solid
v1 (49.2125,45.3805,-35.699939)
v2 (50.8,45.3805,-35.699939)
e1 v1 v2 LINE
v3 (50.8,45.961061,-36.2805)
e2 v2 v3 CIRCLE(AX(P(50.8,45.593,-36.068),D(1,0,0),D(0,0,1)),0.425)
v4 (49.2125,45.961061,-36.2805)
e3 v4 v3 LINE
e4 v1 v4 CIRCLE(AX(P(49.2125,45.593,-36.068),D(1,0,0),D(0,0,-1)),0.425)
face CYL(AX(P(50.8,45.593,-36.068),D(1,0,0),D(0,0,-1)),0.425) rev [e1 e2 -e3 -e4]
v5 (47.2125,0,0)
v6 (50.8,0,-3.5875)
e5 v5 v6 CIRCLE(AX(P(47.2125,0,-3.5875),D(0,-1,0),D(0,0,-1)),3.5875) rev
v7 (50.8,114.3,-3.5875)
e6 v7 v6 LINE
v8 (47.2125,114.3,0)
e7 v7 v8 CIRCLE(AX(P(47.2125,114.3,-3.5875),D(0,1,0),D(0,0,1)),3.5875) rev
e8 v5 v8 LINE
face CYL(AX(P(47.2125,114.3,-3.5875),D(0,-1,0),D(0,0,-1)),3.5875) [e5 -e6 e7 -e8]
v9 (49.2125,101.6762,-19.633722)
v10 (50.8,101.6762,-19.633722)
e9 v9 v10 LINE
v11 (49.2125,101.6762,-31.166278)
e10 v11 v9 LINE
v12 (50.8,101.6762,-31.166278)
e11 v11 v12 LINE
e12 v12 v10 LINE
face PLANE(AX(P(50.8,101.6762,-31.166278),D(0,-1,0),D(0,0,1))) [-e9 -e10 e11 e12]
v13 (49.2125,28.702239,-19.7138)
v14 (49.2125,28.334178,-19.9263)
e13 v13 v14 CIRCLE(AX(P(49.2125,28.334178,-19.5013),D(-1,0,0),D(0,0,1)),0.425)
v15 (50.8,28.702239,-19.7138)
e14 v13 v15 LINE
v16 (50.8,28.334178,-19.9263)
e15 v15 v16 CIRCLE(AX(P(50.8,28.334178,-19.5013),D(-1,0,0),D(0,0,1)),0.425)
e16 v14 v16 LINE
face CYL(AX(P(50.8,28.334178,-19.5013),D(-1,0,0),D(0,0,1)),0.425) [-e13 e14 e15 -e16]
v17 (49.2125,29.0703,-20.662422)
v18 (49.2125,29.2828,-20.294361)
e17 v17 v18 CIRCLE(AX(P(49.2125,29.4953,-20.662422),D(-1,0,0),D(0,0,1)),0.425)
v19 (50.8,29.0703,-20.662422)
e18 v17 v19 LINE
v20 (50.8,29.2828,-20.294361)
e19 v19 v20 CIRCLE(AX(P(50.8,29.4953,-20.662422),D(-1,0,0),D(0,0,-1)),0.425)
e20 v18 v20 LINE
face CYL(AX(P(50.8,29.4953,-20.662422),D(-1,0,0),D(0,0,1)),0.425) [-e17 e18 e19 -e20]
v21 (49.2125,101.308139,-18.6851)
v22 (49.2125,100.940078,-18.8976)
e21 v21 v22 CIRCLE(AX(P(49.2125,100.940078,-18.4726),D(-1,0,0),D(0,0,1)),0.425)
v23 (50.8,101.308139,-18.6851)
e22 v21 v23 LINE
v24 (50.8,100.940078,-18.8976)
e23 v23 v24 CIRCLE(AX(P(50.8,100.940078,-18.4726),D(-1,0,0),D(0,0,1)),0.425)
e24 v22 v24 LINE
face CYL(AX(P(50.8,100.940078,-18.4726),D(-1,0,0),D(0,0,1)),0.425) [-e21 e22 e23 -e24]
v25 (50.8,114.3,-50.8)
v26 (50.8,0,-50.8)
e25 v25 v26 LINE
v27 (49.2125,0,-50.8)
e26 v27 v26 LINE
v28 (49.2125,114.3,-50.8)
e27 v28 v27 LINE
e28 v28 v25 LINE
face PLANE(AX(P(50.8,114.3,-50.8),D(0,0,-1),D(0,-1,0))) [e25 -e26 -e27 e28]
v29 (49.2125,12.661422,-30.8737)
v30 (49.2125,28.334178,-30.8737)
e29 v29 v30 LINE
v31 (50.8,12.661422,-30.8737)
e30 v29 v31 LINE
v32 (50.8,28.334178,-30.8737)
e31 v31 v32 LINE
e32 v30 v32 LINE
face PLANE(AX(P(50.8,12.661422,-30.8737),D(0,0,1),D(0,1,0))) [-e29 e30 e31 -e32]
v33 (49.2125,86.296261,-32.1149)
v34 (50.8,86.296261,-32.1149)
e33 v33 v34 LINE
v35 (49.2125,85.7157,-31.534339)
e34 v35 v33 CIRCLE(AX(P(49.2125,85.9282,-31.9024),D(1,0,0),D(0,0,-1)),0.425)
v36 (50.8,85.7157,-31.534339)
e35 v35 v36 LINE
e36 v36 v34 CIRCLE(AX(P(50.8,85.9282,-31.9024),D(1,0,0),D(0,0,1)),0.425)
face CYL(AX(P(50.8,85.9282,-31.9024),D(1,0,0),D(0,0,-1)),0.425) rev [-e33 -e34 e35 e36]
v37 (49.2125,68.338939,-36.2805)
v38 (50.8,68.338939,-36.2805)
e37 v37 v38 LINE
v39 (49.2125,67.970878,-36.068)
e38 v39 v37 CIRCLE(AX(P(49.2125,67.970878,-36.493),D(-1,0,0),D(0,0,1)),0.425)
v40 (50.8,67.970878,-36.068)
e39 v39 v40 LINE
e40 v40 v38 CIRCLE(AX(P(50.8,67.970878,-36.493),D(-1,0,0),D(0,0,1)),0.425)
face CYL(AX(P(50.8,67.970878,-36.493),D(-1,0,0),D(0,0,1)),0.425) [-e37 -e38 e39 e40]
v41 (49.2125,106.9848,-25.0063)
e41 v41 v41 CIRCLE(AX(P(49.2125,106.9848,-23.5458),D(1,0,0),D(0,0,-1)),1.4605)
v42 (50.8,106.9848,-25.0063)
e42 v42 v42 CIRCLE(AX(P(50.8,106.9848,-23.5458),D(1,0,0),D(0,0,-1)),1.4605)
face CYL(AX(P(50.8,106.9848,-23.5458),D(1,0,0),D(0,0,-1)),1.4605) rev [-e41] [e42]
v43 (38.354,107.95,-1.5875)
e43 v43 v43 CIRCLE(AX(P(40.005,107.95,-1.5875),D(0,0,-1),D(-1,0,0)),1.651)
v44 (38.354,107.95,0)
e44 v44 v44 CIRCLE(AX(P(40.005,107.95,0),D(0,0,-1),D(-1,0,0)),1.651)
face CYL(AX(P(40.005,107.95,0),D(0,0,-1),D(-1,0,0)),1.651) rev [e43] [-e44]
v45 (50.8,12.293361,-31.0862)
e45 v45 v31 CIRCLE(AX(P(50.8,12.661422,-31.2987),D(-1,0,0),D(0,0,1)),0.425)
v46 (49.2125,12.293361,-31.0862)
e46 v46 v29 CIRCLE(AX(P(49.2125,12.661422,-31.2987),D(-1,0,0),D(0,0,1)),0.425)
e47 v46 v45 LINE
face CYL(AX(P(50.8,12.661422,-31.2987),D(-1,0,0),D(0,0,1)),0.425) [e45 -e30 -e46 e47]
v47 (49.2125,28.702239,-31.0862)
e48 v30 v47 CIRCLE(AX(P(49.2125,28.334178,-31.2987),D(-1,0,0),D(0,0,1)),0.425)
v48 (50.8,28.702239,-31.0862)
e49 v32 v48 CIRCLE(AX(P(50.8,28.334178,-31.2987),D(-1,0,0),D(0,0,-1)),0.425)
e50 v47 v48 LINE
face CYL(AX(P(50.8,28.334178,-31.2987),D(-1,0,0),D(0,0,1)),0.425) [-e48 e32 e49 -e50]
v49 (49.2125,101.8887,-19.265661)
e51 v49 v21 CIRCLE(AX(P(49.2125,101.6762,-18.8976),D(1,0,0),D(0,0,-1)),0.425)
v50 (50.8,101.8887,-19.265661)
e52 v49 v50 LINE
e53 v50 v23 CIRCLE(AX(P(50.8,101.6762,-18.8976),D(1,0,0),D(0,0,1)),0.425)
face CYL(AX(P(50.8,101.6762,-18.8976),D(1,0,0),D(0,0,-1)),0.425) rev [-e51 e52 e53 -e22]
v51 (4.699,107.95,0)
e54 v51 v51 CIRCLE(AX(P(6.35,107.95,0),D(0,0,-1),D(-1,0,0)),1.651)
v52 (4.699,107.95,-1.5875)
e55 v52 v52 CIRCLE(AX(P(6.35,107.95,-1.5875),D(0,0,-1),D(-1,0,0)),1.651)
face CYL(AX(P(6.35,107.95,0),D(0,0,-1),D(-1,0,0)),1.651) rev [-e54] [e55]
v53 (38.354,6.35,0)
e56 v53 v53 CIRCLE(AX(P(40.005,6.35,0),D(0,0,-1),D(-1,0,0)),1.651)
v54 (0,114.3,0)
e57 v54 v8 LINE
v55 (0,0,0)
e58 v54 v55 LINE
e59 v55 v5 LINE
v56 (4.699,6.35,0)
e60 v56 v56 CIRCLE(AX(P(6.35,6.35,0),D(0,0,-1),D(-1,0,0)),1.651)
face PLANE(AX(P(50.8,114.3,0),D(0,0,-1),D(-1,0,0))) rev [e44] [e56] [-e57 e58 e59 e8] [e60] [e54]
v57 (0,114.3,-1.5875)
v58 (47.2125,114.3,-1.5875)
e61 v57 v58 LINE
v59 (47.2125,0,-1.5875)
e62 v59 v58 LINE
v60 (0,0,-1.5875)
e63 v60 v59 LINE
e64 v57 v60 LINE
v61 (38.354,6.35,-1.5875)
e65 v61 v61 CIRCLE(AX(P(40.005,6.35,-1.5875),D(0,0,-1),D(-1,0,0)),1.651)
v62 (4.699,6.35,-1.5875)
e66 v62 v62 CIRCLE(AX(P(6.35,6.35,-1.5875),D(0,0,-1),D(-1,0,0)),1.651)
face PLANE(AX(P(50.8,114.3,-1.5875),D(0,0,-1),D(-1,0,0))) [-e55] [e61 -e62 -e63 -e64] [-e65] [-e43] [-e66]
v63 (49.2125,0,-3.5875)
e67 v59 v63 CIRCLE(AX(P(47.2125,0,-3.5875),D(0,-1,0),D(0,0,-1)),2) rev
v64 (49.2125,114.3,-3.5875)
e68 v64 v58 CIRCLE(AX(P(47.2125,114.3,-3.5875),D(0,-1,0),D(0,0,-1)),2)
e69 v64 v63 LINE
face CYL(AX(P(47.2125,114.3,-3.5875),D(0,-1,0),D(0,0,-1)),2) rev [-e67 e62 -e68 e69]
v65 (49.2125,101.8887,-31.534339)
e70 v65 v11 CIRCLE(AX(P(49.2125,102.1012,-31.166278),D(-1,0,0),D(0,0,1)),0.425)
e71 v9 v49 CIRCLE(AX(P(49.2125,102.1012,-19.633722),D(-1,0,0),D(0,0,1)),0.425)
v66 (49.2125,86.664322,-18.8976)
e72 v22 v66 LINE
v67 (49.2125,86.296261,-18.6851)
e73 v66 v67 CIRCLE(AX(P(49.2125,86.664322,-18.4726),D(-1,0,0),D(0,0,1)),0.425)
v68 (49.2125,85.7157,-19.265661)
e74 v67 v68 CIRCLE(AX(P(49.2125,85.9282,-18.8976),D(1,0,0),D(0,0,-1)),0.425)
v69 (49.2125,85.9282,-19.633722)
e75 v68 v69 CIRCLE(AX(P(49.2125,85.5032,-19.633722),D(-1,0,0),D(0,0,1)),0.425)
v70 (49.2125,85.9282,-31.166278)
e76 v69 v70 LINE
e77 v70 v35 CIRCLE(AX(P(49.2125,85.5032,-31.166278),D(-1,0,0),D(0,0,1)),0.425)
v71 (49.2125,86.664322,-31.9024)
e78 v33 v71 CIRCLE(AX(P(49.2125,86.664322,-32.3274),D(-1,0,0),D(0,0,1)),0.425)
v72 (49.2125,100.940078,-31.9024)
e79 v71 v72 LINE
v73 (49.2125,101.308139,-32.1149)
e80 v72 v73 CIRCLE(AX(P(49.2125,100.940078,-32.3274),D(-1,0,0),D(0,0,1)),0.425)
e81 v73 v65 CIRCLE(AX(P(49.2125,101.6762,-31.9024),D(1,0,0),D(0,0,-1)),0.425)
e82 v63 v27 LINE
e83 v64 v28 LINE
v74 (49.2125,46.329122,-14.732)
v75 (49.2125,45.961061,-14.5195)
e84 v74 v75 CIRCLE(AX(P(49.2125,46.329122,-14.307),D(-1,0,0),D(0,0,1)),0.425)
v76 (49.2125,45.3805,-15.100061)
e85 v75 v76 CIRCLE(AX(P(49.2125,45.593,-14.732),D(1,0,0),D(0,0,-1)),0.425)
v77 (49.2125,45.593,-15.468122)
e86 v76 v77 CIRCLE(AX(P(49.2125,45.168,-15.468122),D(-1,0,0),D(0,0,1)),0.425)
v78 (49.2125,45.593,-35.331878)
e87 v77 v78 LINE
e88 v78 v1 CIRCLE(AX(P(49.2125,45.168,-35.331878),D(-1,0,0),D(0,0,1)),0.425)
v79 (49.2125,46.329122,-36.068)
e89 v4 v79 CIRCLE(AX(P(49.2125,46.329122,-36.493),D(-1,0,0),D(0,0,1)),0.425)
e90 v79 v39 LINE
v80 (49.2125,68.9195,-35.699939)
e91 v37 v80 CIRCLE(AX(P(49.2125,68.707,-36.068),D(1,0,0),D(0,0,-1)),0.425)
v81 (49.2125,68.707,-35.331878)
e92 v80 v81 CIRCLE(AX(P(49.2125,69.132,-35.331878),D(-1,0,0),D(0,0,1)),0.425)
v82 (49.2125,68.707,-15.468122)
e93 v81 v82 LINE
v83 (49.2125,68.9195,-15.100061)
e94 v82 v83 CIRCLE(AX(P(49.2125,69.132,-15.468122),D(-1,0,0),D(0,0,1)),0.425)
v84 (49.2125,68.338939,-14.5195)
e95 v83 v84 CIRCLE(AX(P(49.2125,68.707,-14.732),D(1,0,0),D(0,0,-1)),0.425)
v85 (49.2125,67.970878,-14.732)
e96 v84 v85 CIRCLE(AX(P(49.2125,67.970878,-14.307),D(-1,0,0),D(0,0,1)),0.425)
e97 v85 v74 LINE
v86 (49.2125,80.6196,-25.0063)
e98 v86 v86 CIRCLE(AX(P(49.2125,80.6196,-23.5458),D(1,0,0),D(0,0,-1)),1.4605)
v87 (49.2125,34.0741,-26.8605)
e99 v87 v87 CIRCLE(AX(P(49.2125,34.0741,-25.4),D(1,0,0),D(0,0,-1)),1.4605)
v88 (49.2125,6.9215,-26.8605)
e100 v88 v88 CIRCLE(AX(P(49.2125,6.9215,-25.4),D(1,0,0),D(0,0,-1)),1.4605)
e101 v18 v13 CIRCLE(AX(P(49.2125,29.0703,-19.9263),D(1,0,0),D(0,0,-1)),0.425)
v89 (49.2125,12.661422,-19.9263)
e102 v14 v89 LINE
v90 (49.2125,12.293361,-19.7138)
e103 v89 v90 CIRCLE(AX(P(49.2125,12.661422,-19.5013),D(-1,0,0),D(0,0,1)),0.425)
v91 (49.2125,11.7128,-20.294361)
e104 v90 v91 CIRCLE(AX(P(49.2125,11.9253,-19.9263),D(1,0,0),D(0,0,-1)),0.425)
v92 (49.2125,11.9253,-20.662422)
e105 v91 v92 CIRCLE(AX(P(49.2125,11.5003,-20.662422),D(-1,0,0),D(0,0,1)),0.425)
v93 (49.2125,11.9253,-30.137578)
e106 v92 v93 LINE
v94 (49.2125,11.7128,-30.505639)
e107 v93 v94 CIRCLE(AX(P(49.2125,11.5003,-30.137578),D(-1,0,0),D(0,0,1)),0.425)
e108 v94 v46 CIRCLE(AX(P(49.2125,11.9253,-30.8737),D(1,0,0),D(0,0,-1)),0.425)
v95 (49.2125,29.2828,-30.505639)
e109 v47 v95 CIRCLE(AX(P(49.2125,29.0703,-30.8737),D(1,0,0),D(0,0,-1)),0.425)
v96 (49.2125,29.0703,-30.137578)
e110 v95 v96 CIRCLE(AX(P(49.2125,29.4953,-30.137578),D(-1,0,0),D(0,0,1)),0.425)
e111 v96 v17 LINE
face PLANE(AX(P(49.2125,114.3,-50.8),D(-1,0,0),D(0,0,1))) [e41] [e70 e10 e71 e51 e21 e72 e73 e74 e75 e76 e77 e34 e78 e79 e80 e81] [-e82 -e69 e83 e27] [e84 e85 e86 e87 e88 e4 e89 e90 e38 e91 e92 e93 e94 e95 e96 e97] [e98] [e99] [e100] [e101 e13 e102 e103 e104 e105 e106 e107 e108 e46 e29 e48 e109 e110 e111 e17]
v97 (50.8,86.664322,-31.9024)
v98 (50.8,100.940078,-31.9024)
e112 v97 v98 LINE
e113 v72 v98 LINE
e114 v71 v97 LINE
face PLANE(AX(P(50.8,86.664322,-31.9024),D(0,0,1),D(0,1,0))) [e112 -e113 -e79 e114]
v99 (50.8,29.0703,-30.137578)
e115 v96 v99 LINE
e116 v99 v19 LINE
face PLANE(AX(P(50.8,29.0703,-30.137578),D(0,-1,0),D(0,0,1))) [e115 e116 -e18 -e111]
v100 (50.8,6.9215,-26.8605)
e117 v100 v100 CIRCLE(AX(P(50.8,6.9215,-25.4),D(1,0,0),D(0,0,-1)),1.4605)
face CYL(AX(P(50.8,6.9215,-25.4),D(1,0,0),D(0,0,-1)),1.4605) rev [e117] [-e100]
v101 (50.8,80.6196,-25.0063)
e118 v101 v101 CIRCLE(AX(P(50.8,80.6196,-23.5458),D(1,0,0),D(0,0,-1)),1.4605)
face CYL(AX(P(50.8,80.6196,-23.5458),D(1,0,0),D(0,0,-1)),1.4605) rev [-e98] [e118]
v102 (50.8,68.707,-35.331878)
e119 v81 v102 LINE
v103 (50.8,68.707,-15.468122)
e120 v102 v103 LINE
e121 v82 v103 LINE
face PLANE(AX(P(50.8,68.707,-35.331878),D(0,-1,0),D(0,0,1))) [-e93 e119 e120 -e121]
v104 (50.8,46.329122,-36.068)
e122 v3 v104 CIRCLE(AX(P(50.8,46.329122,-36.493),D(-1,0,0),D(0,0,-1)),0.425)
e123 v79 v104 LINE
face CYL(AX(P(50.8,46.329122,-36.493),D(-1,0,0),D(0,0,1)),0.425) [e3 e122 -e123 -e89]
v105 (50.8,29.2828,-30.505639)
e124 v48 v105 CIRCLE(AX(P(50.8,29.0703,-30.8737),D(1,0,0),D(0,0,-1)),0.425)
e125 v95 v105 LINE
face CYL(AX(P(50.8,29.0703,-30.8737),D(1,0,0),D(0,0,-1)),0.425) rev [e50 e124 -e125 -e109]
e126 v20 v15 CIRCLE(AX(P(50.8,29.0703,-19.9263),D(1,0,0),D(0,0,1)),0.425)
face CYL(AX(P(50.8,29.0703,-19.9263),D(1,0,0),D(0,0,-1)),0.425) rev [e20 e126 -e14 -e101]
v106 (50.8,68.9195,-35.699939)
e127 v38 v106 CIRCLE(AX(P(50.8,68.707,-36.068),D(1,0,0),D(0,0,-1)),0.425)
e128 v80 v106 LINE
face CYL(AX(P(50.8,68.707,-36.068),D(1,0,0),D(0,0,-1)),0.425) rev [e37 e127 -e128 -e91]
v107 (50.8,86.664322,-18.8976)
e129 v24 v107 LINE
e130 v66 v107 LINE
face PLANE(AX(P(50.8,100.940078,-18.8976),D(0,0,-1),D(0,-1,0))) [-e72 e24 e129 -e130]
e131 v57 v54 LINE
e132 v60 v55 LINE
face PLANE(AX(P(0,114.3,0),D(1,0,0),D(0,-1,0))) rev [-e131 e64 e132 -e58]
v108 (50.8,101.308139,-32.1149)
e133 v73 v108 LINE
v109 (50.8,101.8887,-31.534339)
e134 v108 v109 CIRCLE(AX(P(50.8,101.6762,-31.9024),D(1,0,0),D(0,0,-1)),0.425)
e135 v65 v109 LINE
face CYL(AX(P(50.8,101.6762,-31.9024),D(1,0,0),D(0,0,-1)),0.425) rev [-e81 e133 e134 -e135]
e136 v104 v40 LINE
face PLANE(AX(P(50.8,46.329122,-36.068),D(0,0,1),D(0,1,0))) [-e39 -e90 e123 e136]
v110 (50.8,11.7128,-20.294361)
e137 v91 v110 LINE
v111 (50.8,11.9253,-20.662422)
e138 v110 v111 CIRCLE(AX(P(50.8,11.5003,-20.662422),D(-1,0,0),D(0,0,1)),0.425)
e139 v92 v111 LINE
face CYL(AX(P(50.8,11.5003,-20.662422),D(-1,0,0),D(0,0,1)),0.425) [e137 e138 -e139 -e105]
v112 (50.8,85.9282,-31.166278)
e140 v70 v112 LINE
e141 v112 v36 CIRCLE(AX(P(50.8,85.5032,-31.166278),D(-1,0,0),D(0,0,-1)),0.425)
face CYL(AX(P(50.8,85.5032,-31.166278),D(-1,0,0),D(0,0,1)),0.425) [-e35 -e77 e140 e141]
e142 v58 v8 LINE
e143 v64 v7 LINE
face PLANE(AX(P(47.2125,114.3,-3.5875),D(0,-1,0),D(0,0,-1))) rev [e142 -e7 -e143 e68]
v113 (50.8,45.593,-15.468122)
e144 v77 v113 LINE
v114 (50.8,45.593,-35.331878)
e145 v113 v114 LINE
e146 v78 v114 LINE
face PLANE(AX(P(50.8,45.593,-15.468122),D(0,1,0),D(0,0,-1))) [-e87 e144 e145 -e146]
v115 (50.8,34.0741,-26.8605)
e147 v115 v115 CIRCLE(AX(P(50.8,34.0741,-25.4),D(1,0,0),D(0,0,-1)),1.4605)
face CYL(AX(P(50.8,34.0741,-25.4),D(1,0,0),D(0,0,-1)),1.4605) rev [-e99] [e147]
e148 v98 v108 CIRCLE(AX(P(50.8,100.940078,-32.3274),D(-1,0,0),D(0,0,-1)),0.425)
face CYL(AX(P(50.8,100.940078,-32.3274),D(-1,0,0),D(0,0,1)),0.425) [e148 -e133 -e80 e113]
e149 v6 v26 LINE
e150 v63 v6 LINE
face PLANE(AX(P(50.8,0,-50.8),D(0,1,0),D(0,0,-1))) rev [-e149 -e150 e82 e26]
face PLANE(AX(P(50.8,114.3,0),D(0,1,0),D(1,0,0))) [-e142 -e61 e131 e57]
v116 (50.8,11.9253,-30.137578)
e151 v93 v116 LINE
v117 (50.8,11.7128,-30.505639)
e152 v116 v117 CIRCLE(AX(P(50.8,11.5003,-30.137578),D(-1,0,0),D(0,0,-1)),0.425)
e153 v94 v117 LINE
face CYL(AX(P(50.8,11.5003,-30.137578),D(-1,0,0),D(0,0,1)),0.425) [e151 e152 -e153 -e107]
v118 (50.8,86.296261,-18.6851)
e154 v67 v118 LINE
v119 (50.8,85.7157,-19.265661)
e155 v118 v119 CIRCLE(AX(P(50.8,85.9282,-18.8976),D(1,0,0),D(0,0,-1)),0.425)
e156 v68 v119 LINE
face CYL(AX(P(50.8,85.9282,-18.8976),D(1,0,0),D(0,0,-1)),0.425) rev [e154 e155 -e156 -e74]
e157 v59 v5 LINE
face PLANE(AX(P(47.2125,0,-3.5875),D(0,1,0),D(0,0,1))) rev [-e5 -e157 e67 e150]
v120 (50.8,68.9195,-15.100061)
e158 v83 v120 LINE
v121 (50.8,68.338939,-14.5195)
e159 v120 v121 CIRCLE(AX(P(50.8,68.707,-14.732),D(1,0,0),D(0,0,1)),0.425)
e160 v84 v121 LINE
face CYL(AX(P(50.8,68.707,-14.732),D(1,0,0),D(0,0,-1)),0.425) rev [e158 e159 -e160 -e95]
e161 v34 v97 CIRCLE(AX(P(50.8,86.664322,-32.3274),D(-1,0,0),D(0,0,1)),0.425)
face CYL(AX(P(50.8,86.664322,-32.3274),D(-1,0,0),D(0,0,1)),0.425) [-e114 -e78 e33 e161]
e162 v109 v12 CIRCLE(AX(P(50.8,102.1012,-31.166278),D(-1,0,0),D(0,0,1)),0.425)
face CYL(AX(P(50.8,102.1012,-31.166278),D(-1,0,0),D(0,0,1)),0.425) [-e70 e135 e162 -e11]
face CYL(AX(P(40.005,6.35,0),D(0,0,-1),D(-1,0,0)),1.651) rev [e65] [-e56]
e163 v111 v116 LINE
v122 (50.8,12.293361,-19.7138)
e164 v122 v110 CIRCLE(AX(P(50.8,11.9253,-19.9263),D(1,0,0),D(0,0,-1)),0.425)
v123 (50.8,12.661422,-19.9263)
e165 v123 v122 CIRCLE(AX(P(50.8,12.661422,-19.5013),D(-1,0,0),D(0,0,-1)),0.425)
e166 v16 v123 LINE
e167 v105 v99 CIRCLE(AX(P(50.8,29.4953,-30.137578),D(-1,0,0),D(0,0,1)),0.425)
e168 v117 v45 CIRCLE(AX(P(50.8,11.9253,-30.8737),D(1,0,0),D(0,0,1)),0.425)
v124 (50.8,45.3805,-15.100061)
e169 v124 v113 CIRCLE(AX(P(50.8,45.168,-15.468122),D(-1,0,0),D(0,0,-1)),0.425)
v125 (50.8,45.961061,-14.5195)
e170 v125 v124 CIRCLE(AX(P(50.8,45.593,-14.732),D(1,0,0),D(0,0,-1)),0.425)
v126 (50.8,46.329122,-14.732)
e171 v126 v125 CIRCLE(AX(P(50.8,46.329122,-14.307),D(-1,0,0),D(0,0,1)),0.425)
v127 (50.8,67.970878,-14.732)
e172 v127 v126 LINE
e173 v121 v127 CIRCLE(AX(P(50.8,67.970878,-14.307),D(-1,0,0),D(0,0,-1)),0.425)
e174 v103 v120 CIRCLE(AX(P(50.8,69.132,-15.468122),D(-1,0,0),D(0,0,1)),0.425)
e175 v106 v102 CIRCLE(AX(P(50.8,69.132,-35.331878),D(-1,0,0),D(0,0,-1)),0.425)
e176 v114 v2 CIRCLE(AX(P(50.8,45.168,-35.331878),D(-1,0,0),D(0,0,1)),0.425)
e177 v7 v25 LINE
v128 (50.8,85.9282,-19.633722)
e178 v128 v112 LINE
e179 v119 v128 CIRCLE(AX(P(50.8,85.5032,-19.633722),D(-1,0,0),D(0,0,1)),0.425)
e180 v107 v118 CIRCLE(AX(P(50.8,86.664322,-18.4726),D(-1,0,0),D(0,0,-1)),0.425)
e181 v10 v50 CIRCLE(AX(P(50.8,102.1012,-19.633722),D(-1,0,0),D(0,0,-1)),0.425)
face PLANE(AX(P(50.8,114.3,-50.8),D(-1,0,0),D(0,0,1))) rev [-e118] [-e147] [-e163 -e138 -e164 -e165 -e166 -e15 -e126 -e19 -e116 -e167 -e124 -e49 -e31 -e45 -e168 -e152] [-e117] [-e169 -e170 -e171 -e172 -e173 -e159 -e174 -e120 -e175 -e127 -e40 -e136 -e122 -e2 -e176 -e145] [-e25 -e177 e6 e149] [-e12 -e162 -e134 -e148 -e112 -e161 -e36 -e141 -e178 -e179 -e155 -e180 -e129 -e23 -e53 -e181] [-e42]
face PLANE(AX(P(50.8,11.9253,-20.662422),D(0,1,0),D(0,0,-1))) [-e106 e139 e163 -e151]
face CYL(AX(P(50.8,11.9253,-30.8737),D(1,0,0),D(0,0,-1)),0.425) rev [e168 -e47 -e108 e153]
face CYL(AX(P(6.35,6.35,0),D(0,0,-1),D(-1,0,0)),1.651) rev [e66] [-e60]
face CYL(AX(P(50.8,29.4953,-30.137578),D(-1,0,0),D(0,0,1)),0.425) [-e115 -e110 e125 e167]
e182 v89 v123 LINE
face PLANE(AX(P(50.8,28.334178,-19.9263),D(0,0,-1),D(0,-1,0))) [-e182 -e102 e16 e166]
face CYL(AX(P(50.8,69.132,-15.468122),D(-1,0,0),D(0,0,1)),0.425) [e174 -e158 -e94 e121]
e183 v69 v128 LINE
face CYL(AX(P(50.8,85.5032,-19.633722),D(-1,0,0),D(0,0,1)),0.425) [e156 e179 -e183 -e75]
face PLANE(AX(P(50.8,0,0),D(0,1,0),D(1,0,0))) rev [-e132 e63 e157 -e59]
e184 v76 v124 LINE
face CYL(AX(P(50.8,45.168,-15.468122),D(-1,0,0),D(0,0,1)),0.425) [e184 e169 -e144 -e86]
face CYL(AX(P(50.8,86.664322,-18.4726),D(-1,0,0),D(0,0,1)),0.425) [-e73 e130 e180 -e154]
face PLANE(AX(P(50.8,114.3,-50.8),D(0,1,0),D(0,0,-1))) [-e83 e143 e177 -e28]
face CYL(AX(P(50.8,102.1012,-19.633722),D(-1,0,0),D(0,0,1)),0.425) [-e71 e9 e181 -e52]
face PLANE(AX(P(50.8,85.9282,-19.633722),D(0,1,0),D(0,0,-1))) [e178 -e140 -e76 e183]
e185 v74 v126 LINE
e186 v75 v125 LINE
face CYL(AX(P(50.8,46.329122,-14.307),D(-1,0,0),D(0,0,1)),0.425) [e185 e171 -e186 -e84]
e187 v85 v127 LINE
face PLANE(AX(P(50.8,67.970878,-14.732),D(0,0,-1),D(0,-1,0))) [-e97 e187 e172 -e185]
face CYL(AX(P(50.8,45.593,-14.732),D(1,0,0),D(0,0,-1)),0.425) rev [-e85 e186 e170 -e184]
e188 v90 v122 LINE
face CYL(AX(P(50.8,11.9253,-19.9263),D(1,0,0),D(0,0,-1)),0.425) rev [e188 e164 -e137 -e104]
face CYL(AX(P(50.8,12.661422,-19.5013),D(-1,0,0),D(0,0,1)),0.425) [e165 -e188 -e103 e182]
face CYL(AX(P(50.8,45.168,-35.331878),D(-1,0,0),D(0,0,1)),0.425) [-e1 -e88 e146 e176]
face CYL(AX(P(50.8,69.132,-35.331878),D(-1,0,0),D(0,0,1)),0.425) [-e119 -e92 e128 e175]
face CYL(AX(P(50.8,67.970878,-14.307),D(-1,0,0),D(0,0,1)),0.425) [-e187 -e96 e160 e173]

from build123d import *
from build123d.topology import SkipClean

# Parameters (mm, degrees)
BOSS_EXTRUDE1_DEPTH        = 114.3
SKETCH3_R                  = 1.651
CUT_EXTRUDE2_DEPTH         = 135.530111499
SKETCH5_R                  = 1.4605
CUT_EXTRUDE3_DEPTH         = 136.002851822
CONVERT_SOLID2_START       = 49.2125
CONVERT_SOLID2_OUTLINE_W   = 114.3
CONVERT_SOLID2_OUTLINE_H   = 49.53
CONVERT_SOLID2_OUTLINE_R   = 1.4605
CONVERT_SOLID2_DEPTH       = 0.3175
CONVERT_SOLID2_START_2     = 8.000755338
CONVERT_SOLID2_2_OUTLINE_W = 114.3
CONVERT_SOLID2_2_OUTLINE_H = 0.3175
CONVERT_SOLID2_2_DEPTH     = 30.652049453
CONVERT_SOLID2_START_3     = 41.655755338
CONVERT_SOLID2_3_OUTLINE_W = 114.3
CONVERT_SOLID2_3_OUTLINE_H = 0.3175
CONVERT_SOLID2_3_DEPTH     = 7.556744662
CONVERT_SOLID2_4_OUTLINE_W = 114.3
CONVERT_SOLID2_4_OUTLINE_H = 0.3175
CONVERT_SOLID2_4_DEPTH     = 4.997804791
CONVERT_SOLID2_START_4     = -1.5875
CONVERT_SOLID2_5_DEPTH     = 0.3175
CONVERT_SOLID2_6_DEPTH     = 0.3175
CONVERT_SOLID2_7_DEPTH     = 114.3
CONVERT_SOLID2_8_DEPTH     = 114.3


with BuildPart() as part:
    # Sketch1 → Boss-Extrude1 (new body)
    with BuildSketch(Plane(origin=(0, 0, 0), x_dir=(1, 0, 0), z_dir=(0, 1, 0))):
        Polygon((0, 0), (0, 1.27), (49.53, 1.27), (49.53, 50.8), (50.8, 50.8), (50.8, 0), align=None)
    extrude(amount=BOSS_EXTRUDE1_DEPTH)

    # Sketch3 → Cut-Extrude2 (cut, through all)
    with BuildSketch(Plane(origin=(0, 0, -1.27), x_dir=(-1, 0, 0), z_dir=(0, 0, -1))):
        with Locations((-6.35, 107.95)):
            Circle(SKETCH3_R)
        with Locations((-6.35, 6.35)):
            Circle(SKETCH3_R)
        with Locations((-40.005, 6.35)):
            Circle(SKETCH3_R)
        with Locations((-40.005, 107.95)):
            Circle(SKETCH3_R)
    extrude(amount=-CUT_EXTRUDE2_DEPTH, mode=Mode.SUBTRACT)

    # Sketch5 → Cut-Extrude3 (cut, through all)
    with BuildSketch(Plane(origin=(50.8, 0, 0), x_dir=(0, 0, -1), z_dir=(1, 0, 0))):
        with Locations((25.4, 6.9215)):
            Circle(SKETCH5_R)
        with Locations((25.4, 34.0741)):
            Circle(SKETCH5_R)
        with Locations((23.5458, 80.6196)):
            Circle(SKETCH5_R)
        with Locations((23.5458, 106.9848)):
            Circle(SKETCH5_R)
        with BuildLine():
            Line((31.9024, 86.664321593), (31.9024, 100.940078407))
            ThreePointArc((31.9024, 100.940078407), (31.959339203, 101.152578407), (32.1149, 101.308139203))
            ThreePointArc((32.1149, 101.308139203), (32.202920382, 101.976720382), (31.534339203, 101.8887))
            ThreePointArc((31.534339203, 101.8887), (31.378778407, 101.733139203), (31.166278407, 101.6762))
            Line((31.166278407, 101.6762), (19.633721593, 101.6762))
            ThreePointArc((19.633721593, 101.6762), (19.421221593, 101.733139203), (19.265660797, 101.8887))
            ThreePointArc((19.265660797, 101.8887), (18.597079618, 101.976720382), (18.6851, 101.308139203))
            ThreePointArc((18.6851, 101.308139203), (18.840660797, 101.152578407), (18.8976, 100.940078407))
            Line((18.8976, 100.940078407), (18.8976, 86.664321593))
            ThreePointArc((18.8976, 86.664321593), (18.840660797, 86.451821593), (18.6851, 86.296260797))
            ThreePointArc((18.6851, 86.296260797), (18.597079618, 85.627679618), (19.265660797, 85.7157))
            ThreePointArc((19.265660797, 85.7157), (19.421221593, 85.871260797), (19.633721593, 85.9282))
            Line((19.633721593, 85.9282), (31.166278407, 85.9282))
            ThreePointArc((31.166278407, 85.9282), (31.378778407, 85.871260797), (31.534339203, 85.7157))
            ThreePointArc((31.534339203, 85.7157), (32.202920382, 85.627679618), (32.1149, 86.296260797))
            ThreePointArc((32.1149, 86.296260797), (31.959339203, 86.451821593), (31.9024, 86.664321593))
        make_face()
        with BuildLine():
            Line((19.9263, 28.334178407), (19.9263, 12.661421593))
            ThreePointArc((19.9263, 12.661421593), (19.869360797, 12.448921593), (19.7138, 12.293360797))
            ThreePointArc((19.7138, 12.293360797), (19.625779618, 11.624779618), (20.294360797, 11.7128))
            ThreePointArc((20.294360797, 11.7128), (20.449921593, 11.868360797), (20.662421593, 11.9253))
            Line((20.662421593, 11.9253), (30.137578407, 11.9253))
            ThreePointArc((30.137578407, 11.9253), (30.350078407, 11.868360797), (30.505639203, 11.7128))
            ThreePointArc((30.505639203, 11.7128), (31.174220382, 11.624779618), (31.0862, 12.293360797))
            ThreePointArc((31.0862, 12.293360797), (30.930639203, 12.448921593), (30.8737, 12.661421593))
            Line((30.8737, 12.661421593), (30.8737, 28.334178407))
            ThreePointArc((30.8737, 28.334178407), (30.930639203, 28.546678407), (31.0862, 28.702239203))
            ThreePointArc((31.0862, 28.702239203), (31.174220382, 29.370820382), (30.505639203, 29.2828))
            ThreePointArc((30.505639203, 29.2828), (30.350078407, 29.127239203), (30.137578407, 29.0703))
            Line((30.137578407, 29.0703), (20.662421593, 29.0703))
            ThreePointArc((20.662421593, 29.0703), (20.449921593, 29.127239203), (20.294360797, 29.2828))
            ThreePointArc((20.294360797, 29.2828), (19.625779618, 29.370820382), (19.7138, 28.702239203))
            ThreePointArc((19.7138, 28.702239203), (19.869360797, 28.546678407), (19.9263, 28.334178407))
        make_face()
        with BuildLine():
            Line((14.732, 67.970878407), (14.732, 46.329121593))
            ThreePointArc((14.732, 46.329121593), (14.675060797, 46.116621593), (14.5195, 45.961060797))
            ThreePointArc((14.5195, 45.961060797), (14.431479618, 45.292479618), (15.100060797, 45.3805))
            ThreePointArc((15.100060797, 45.3805), (15.255621593, 45.536060797), (15.468121593, 45.593))
            Line((15.468121593, 45.593), (35.331878407, 45.593))
            ThreePointArc((35.331878407, 45.593), (35.544378407, 45.536060797), (35.699939203, 45.3805))
            ThreePointArc((35.699939203, 45.3805), (36.368520382, 45.292479618), (36.2805, 45.961060797))
            ThreePointArc((36.2805, 45.961060797), (36.124939203, 46.116621593), (36.068, 46.329121593))
            Line((36.068, 46.329121593), (36.068, 67.970878407))
            ThreePointArc((36.068, 67.970878407), (36.124939203, 68.183378407), (36.2805, 68.338939203))
            ThreePointArc((36.2805, 68.338939203), (36.368520382, 69.007520382), (35.699939203, 68.9195))
            ThreePointArc((35.699939203, 68.9195), (35.544378407, 68.763939203), (35.331878407, 68.707))
            Line((35.331878407, 68.707), (15.468121593, 68.707))
            ThreePointArc((15.468121593, 68.707), (15.255621593, 68.763939203), (15.100060797, 68.9195))
            ThreePointArc((15.100060797, 68.9195), (14.431479618, 69.007520382), (14.5195, 68.338939203))
            ThreePointArc((14.5195, 68.338939203), (14.675060797, 68.183378407), (14.732, 67.970878407))
        make_face()
    extrude(amount=-CUT_EXTRUDE3_DEPTH, mode=Mode.SUBTRACT)

    # Convert-Solid2: read off the stored shape, not the designer's step
    # Convert-Solid2 outline → Convert-Solid2 (add)
    with SkipClean():  # the faces are left unmerged after this step: merging them gives an invalid solid
        with BuildSketch(Plane.YZ.offset(CONVERT_SOLID2_START)):
            with Locations((57.15, -26.035)):
                Rectangle(CONVERT_SOLID2_OUTLINE_W, CONVERT_SOLID2_OUTLINE_H)
            with Locations((6.9215, -25.4)):
                Circle(CONVERT_SOLID2_OUTLINE_R, mode=Mode.SUBTRACT)
            with BuildLine():
                ThreePointArc((28.702239203, -31.0862), (28.546678407, -30.930639203), (28.334178407, -30.8737))
                Line((28.334178407, -30.8737), (12.661421593, -30.8737))
                ThreePointArc((12.661421593, -30.8737), (12.448921593, -30.930639203), (12.293360797, -31.0862))
                ThreePointArc((12.293360797, -31.0862), (11.624779618, -31.174220382), (11.7128, -30.505639203))
                ThreePointArc((11.7128, -30.505639203), (11.868360797, -30.350078407), (11.9253, -30.137578407))
                Line((11.9253, -30.137578407), (11.9253, -20.662421593))
                ThreePointArc((11.9253, -20.662421593), (11.868360797, -20.449921593), (11.7128, -20.294360797))
                ThreePointArc((11.7128, -20.294360797), (11.624779618, -19.625779618), (12.293360797, -19.7138))
                ThreePointArc((12.293360797, -19.7138), (12.448921593, -19.869360797), (12.661421593, -19.9263))
                Line((12.661421593, -19.9263), (28.334178407, -19.9263))
                ThreePointArc((28.334178407, -19.9263), (28.546678407, -19.869360797), (28.702239203, -19.7138))
                ThreePointArc((28.702239203, -19.7138), (29.370820382, -19.625779618), (29.2828, -20.294360797))
                ThreePointArc((29.2828, -20.294360797), (29.127239203, -20.449921593), (29.0703, -20.662421593))
                Line((29.0703, -20.662421593), (29.0703, -30.137578407))
                ThreePointArc((29.0703, -30.137578407), (29.127239203, -30.350078407), (29.2828, -30.505639203))
                ThreePointArc((29.2828, -30.505639203), (29.370820382, -31.174220382), (28.702239203, -31.0862))
            make_face(mode=Mode.SUBTRACT)
            with Locations((34.0741, -25.4)):
                Circle(CONVERT_SOLID2_OUTLINE_R, mode=Mode.SUBTRACT)
            with BuildLine():
                ThreePointArc((68.9195, -35.699939203), (69.007520382, -36.368520382), (68.338939203, -36.2805))
                ThreePointArc((68.338939203, -36.2805), (68.183378407, -36.124939203), (67.970878407, -36.068))
                Line((67.970878407, -36.068), (46.329121593, -36.068))
                ThreePointArc((46.329121593, -36.068), (46.116621593, -36.124939203), (45.961060797, -36.2805))
                ThreePointArc((45.961060797, -36.2805), (45.292479618, -36.368520382), (45.3805, -35.699939203))
                ThreePointArc((45.3805, -35.699939203), (45.536060797, -35.544378407), (45.593, -35.331878407))
                Line((45.593, -35.331878407), (45.593, -15.468121593))
                ThreePointArc((45.593, -15.468121593), (45.536060797, -15.255621593), (45.3805, -15.100060797))
                ThreePointArc((45.3805, -15.100060797), (45.292479618, -14.431479618), (45.961060797, -14.5195))
                ThreePointArc((45.961060797, -14.5195), (46.116621593, -14.675060797), (46.329121593, -14.732))
                Line((46.329121593, -14.732), (67.970878407, -14.732))
                ThreePointArc((67.970878407, -14.732), (68.183378407, -14.675060797), (68.338939203, -14.5195))
                ThreePointArc((68.338939203, -14.5195), (69.007520382, -14.431479618), (68.9195, -15.100060797))
                ThreePointArc((68.9195, -15.100060797), (68.763939203, -15.255621593), (68.707, -15.468121593))
                Line((68.707, -15.468121593), (68.707, -35.331878407))
                ThreePointArc((68.707, -35.331878407), (68.763939203, -35.544378407), (68.9195, -35.699939203))
            make_face(mode=Mode.SUBTRACT)
            with Locations((80.6196, -23.5458)):
                Circle(CONVERT_SOLID2_OUTLINE_R, mode=Mode.SUBTRACT)
            with BuildLine():
                ThreePointArc((101.308139203, -32.1149), (101.152578407, -31.959339203), (100.940078407, -31.9024))
                Line((100.940078407, -31.9024), (86.664321593, -31.9024))
                ThreePointArc((86.664321593, -31.9024), (86.451821593, -31.959339203), (86.296260797, -32.1149))
                ThreePointArc((86.296260797, -32.1149), (85.627679618, -32.202920382), (85.7157, -31.534339203))
                ThreePointArc((85.7157, -31.534339203), (85.871260797, -31.378778407), (85.9282, -31.166278407))
                Line((85.9282, -31.166278407), (85.9282, -19.633721593))
                ThreePointArc((85.9282, -19.633721593), (85.871260797, -19.421221593), (85.7157, -19.265660797))
                ThreePointArc((85.7157, -19.265660797), (85.627679618, -18.597079618), (86.296260797, -18.6851))
                ThreePointArc((86.296260797, -18.6851), (86.451821593, -18.840660797), (86.664321593, -18.8976))
                Line((86.664321593, -18.8976), (100.940078407, -18.8976))
                ThreePointArc((100.940078407, -18.8976), (101.152578407, -18.840660797), (101.308139203, -18.6851))
                ThreePointArc((101.308139203, -18.6851), (101.976720382, -18.597079618), (101.8887, -19.265660797))
                ThreePointArc((101.8887, -19.265660797), (101.733139203, -19.421221593), (101.6762, -19.633721593))
                Line((101.6762, -19.633721593), (101.6762, -31.166278407))
                ThreePointArc((101.6762, -31.166278407), (101.733139203, -31.378778407), (101.8887, -31.534339203))
                ThreePointArc((101.8887, -31.534339203), (101.976720382, -32.202920382), (101.308139203, -32.1149))
            make_face(mode=Mode.SUBTRACT)
            with Locations((106.9848, -23.5458)):
                Circle(CONVERT_SOLID2_OUTLINE_R, mode=Mode.SUBTRACT)
        extrude(amount=CONVERT_SOLID2_DEPTH)

    # Convert-Solid2 2 outline → Convert-Solid2 2 (add)
    with SkipClean():  # the faces are left unmerged after this step: merging them gives an invalid solid
        with BuildSketch(Plane.YZ.offset(CONVERT_SOLID2_START_2)):
            with Locations((57.15, -1.42875)):
                Rectangle(CONVERT_SOLID2_2_OUTLINE_W, CONVERT_SOLID2_2_OUTLINE_H)
        extrude(amount=CONVERT_SOLID2_2_DEPTH)

    # Convert-Solid2 3 outline → Convert-Solid2 3 (add)
    with SkipClean():  # the faces are left unmerged after this step: merging them gives an invalid solid
        with BuildSketch(Plane.YZ.offset(CONVERT_SOLID2_START_3)):
            with Locations((57.15, -1.42875)):
                Rectangle(CONVERT_SOLID2_3_OUTLINE_W, CONVERT_SOLID2_3_OUTLINE_H)
        extrude(amount=CONVERT_SOLID2_3_DEPTH)

    # Convert-Solid2 4 outline → Convert-Solid2 4 (add)
    with SkipClean():  # the faces are left unmerged after this step: merging them gives an invalid solid
        with BuildSketch(Plane.YZ):
            with Locations((57.15, -1.42875)):
                Rectangle(CONVERT_SOLID2_4_OUTLINE_W, CONVERT_SOLID2_4_OUTLINE_H)
        extrude(amount=CONVERT_SOLID2_4_DEPTH)

    # Convert-Solid2 5 outline → Convert-Solid2 5 (cut)
    with SkipClean():  # the faces are left unmerged after this step: merging them gives an invalid solid
        with BuildSketch(Plane.XY.offset(CONVERT_SOLID2_START_4)):
            with BuildLine():
                ThreePointArc((8.000755338, 6.32157793), (8.001, 6.35), (8.000755338, 6.37842207))
                Line((8.000755338, 6.37842207), (8.000755338, 6.32157793))
            make_face()
            with BuildLine():
                Line((4.997804791, 5.402704314), (4.997804791, 7.297295686))
                ThreePointArc((4.997804791, 7.297295686), (4.699, 6.35), (4.997804791, 5.402704314))
            make_face()
            with BuildLine():
                Line((8.000755338, 107.97842207), (8.000755338, 107.92157793))
                ThreePointArc((8.000755338, 107.92157793), (8.001, 107.95), (8.000755338, 107.97842207))
            make_face()
            with BuildLine():
                ThreePointArc((4.997804791, 108.897295686), (4.699, 107.95), (4.997804791, 107.002704314))
                Line((4.997804791, 107.002704314), (4.997804791, 108.897295686))
            make_face()
            with BuildLine():
                ThreePointArc((38.652804791, 7.297295686), (38.354, 6.35), (38.652804791, 5.402704314))
                Line((38.652804791, 5.402704314), (38.652804791, 7.297295686))
            make_face()
            with BuildLine():
                Line((41.655755338, 6.37842207), (41.655755338, 6.32157793))
                ThreePointArc((41.655755338, 6.32157793), (41.656, 6.35), (41.655755338, 6.37842207))
            make_face()
            with BuildLine():
                Line((38.652804791, 107.002704314), (38.652804791, 108.897295686))
                ThreePointArc((38.652804791, 108.897295686), (38.354, 107.95), (38.652804791, 107.002704314))
            make_face()
            with BuildLine():
                ThreePointArc((41.655755338, 107.92157793), (41.656, 107.95), (41.655755338, 107.97842207))
                Line((41.655755338, 107.97842207), (41.655755338, 107.92157793))
            make_face()
        extrude(amount=CONVERT_SOLID2_5_DEPTH, mode=Mode.SUBTRACT)

    # Convert-Solid2 6 outline → Convert-Solid2 6 (add)
    with SkipClean():  # the faces are left unmerged after this step: merging them gives an invalid solid
        with BuildSketch(Plane.XY.offset(CONVERT_SOLID2_START_4)):
            with BuildLine():
                ThreePointArc((4.997804791, 7.297295686), (6.833080447, 7.928744527), (8.000755338, 6.37842207))
                Line((8.000755338, 6.37842207), (8.000755338, 107.92157793))
                ThreePointArc((8.000755338, 107.92157793), (6.833080447, 106.371255473), (4.997804791, 107.002704314))
                Line((4.997804791, 107.002704314), (4.997804791, 7.297295686))
            make_face()
            with BuildLine():
                Line((8.000755338, 0), (8.000755338, 6.32157793))
                ThreePointArc((8.000755338, 6.32157793), (6.833080447, 4.771255473), (4.997804791, 5.402704314))
                Line((4.997804791, 5.402704314), (4.997804791, 0))
                Line((4.997804791, 0), (8.000755338, 0))
            make_face()
            with BuildLine():
                ThreePointArc((4.997804791, 108.897295686), (6.833080447, 109.528744527), (8.000755338, 107.97842207))
                Line((8.000755338, 107.97842207), (8.000755338, 114.3))
                Line((8.000755338, 114.3), (4.997804791, 114.3))
                Line((4.997804791, 114.3), (4.997804791, 108.897295686))
            make_face()
            with BuildLine():
                Line((38.652804791, 5.402704314), (38.652804791, 0))
                Line((38.652804791, 0), (41.655755338, 0))
                Line((41.655755338, 0), (41.655755338, 6.32157793))
                ThreePointArc((41.655755338, 6.32157793), (40.488080447, 4.771255473), (38.652804791, 5.402704314))
            make_face()
            with BuildLine():
                Line((41.655755338, 114.3), (38.652804791, 114.3))
                Line((38.652804791, 114.3), (38.652804791, 108.897295686))
                ThreePointArc((38.652804791, 108.897295686), (40.488080447, 109.528744527), (41.655755338, 107.97842207))
                Line((41.655755338, 107.97842207), (41.655755338, 114.3))
            make_face()
            with BuildLine():
                Line((38.652804791, 107.002704314), (38.652804791, 7.297295686))
                ThreePointArc((38.652804791, 7.297295686), (40.488080447, 7.928744527), (41.655755338, 6.37842207))
                Line((41.655755338, 6.37842207), (41.655755338, 107.92157793))
                ThreePointArc((41.655755338, 107.92157793), (40.488080447, 106.371255473), (38.652804791, 107.002704314))
            make_face()
        extrude(amount=CONVERT_SOLID2_6_DEPTH)

    # Convert-Solid2 7 outline → Convert-Solid2 7 (cut)
    with SkipClean():  # the faces are left unmerged after this step: merging them gives an invalid solid
        with BuildSketch(Plane(origin=(0, 0, 0), x_dir=(1, 0, 0), z_dir=(0, 1, 0))):
            with BuildLine():
                Line((50.8, 0), (50.8, 3.5875))
                ThreePointArc((50.8, 3.5875), (49.749245578, 1.050754422), (47.2125, 0))
                Line((47.2125, 0), (50.8, 0))
            make_face()
        extrude(amount=CONVERT_SOLID2_7_DEPTH, mode=Mode.SUBTRACT)

    # Convert-Solid2 8 outline → Convert-Solid2 8 (add)
    with SkipClean():  # the faces are left unmerged after this step: merging them gives an invalid solid
        with BuildSketch(Plane(origin=(0, 0, 0), x_dir=(1, 0, 0), z_dir=(0, 1, 0))):
            with BuildLine():
                Line((49.2125, 1.5875), (49.2125, 3.5875))
                ThreePointArc((49.2125, 3.5875), (48.626713562, 2.173286438), (47.2125, 1.5875))
                Line((47.2125, 1.5875), (49.2125, 1.5875))
            make_face()
        extrude(amount=CONVERT_SOLID2_8_DEPTH)


solid = part.part
